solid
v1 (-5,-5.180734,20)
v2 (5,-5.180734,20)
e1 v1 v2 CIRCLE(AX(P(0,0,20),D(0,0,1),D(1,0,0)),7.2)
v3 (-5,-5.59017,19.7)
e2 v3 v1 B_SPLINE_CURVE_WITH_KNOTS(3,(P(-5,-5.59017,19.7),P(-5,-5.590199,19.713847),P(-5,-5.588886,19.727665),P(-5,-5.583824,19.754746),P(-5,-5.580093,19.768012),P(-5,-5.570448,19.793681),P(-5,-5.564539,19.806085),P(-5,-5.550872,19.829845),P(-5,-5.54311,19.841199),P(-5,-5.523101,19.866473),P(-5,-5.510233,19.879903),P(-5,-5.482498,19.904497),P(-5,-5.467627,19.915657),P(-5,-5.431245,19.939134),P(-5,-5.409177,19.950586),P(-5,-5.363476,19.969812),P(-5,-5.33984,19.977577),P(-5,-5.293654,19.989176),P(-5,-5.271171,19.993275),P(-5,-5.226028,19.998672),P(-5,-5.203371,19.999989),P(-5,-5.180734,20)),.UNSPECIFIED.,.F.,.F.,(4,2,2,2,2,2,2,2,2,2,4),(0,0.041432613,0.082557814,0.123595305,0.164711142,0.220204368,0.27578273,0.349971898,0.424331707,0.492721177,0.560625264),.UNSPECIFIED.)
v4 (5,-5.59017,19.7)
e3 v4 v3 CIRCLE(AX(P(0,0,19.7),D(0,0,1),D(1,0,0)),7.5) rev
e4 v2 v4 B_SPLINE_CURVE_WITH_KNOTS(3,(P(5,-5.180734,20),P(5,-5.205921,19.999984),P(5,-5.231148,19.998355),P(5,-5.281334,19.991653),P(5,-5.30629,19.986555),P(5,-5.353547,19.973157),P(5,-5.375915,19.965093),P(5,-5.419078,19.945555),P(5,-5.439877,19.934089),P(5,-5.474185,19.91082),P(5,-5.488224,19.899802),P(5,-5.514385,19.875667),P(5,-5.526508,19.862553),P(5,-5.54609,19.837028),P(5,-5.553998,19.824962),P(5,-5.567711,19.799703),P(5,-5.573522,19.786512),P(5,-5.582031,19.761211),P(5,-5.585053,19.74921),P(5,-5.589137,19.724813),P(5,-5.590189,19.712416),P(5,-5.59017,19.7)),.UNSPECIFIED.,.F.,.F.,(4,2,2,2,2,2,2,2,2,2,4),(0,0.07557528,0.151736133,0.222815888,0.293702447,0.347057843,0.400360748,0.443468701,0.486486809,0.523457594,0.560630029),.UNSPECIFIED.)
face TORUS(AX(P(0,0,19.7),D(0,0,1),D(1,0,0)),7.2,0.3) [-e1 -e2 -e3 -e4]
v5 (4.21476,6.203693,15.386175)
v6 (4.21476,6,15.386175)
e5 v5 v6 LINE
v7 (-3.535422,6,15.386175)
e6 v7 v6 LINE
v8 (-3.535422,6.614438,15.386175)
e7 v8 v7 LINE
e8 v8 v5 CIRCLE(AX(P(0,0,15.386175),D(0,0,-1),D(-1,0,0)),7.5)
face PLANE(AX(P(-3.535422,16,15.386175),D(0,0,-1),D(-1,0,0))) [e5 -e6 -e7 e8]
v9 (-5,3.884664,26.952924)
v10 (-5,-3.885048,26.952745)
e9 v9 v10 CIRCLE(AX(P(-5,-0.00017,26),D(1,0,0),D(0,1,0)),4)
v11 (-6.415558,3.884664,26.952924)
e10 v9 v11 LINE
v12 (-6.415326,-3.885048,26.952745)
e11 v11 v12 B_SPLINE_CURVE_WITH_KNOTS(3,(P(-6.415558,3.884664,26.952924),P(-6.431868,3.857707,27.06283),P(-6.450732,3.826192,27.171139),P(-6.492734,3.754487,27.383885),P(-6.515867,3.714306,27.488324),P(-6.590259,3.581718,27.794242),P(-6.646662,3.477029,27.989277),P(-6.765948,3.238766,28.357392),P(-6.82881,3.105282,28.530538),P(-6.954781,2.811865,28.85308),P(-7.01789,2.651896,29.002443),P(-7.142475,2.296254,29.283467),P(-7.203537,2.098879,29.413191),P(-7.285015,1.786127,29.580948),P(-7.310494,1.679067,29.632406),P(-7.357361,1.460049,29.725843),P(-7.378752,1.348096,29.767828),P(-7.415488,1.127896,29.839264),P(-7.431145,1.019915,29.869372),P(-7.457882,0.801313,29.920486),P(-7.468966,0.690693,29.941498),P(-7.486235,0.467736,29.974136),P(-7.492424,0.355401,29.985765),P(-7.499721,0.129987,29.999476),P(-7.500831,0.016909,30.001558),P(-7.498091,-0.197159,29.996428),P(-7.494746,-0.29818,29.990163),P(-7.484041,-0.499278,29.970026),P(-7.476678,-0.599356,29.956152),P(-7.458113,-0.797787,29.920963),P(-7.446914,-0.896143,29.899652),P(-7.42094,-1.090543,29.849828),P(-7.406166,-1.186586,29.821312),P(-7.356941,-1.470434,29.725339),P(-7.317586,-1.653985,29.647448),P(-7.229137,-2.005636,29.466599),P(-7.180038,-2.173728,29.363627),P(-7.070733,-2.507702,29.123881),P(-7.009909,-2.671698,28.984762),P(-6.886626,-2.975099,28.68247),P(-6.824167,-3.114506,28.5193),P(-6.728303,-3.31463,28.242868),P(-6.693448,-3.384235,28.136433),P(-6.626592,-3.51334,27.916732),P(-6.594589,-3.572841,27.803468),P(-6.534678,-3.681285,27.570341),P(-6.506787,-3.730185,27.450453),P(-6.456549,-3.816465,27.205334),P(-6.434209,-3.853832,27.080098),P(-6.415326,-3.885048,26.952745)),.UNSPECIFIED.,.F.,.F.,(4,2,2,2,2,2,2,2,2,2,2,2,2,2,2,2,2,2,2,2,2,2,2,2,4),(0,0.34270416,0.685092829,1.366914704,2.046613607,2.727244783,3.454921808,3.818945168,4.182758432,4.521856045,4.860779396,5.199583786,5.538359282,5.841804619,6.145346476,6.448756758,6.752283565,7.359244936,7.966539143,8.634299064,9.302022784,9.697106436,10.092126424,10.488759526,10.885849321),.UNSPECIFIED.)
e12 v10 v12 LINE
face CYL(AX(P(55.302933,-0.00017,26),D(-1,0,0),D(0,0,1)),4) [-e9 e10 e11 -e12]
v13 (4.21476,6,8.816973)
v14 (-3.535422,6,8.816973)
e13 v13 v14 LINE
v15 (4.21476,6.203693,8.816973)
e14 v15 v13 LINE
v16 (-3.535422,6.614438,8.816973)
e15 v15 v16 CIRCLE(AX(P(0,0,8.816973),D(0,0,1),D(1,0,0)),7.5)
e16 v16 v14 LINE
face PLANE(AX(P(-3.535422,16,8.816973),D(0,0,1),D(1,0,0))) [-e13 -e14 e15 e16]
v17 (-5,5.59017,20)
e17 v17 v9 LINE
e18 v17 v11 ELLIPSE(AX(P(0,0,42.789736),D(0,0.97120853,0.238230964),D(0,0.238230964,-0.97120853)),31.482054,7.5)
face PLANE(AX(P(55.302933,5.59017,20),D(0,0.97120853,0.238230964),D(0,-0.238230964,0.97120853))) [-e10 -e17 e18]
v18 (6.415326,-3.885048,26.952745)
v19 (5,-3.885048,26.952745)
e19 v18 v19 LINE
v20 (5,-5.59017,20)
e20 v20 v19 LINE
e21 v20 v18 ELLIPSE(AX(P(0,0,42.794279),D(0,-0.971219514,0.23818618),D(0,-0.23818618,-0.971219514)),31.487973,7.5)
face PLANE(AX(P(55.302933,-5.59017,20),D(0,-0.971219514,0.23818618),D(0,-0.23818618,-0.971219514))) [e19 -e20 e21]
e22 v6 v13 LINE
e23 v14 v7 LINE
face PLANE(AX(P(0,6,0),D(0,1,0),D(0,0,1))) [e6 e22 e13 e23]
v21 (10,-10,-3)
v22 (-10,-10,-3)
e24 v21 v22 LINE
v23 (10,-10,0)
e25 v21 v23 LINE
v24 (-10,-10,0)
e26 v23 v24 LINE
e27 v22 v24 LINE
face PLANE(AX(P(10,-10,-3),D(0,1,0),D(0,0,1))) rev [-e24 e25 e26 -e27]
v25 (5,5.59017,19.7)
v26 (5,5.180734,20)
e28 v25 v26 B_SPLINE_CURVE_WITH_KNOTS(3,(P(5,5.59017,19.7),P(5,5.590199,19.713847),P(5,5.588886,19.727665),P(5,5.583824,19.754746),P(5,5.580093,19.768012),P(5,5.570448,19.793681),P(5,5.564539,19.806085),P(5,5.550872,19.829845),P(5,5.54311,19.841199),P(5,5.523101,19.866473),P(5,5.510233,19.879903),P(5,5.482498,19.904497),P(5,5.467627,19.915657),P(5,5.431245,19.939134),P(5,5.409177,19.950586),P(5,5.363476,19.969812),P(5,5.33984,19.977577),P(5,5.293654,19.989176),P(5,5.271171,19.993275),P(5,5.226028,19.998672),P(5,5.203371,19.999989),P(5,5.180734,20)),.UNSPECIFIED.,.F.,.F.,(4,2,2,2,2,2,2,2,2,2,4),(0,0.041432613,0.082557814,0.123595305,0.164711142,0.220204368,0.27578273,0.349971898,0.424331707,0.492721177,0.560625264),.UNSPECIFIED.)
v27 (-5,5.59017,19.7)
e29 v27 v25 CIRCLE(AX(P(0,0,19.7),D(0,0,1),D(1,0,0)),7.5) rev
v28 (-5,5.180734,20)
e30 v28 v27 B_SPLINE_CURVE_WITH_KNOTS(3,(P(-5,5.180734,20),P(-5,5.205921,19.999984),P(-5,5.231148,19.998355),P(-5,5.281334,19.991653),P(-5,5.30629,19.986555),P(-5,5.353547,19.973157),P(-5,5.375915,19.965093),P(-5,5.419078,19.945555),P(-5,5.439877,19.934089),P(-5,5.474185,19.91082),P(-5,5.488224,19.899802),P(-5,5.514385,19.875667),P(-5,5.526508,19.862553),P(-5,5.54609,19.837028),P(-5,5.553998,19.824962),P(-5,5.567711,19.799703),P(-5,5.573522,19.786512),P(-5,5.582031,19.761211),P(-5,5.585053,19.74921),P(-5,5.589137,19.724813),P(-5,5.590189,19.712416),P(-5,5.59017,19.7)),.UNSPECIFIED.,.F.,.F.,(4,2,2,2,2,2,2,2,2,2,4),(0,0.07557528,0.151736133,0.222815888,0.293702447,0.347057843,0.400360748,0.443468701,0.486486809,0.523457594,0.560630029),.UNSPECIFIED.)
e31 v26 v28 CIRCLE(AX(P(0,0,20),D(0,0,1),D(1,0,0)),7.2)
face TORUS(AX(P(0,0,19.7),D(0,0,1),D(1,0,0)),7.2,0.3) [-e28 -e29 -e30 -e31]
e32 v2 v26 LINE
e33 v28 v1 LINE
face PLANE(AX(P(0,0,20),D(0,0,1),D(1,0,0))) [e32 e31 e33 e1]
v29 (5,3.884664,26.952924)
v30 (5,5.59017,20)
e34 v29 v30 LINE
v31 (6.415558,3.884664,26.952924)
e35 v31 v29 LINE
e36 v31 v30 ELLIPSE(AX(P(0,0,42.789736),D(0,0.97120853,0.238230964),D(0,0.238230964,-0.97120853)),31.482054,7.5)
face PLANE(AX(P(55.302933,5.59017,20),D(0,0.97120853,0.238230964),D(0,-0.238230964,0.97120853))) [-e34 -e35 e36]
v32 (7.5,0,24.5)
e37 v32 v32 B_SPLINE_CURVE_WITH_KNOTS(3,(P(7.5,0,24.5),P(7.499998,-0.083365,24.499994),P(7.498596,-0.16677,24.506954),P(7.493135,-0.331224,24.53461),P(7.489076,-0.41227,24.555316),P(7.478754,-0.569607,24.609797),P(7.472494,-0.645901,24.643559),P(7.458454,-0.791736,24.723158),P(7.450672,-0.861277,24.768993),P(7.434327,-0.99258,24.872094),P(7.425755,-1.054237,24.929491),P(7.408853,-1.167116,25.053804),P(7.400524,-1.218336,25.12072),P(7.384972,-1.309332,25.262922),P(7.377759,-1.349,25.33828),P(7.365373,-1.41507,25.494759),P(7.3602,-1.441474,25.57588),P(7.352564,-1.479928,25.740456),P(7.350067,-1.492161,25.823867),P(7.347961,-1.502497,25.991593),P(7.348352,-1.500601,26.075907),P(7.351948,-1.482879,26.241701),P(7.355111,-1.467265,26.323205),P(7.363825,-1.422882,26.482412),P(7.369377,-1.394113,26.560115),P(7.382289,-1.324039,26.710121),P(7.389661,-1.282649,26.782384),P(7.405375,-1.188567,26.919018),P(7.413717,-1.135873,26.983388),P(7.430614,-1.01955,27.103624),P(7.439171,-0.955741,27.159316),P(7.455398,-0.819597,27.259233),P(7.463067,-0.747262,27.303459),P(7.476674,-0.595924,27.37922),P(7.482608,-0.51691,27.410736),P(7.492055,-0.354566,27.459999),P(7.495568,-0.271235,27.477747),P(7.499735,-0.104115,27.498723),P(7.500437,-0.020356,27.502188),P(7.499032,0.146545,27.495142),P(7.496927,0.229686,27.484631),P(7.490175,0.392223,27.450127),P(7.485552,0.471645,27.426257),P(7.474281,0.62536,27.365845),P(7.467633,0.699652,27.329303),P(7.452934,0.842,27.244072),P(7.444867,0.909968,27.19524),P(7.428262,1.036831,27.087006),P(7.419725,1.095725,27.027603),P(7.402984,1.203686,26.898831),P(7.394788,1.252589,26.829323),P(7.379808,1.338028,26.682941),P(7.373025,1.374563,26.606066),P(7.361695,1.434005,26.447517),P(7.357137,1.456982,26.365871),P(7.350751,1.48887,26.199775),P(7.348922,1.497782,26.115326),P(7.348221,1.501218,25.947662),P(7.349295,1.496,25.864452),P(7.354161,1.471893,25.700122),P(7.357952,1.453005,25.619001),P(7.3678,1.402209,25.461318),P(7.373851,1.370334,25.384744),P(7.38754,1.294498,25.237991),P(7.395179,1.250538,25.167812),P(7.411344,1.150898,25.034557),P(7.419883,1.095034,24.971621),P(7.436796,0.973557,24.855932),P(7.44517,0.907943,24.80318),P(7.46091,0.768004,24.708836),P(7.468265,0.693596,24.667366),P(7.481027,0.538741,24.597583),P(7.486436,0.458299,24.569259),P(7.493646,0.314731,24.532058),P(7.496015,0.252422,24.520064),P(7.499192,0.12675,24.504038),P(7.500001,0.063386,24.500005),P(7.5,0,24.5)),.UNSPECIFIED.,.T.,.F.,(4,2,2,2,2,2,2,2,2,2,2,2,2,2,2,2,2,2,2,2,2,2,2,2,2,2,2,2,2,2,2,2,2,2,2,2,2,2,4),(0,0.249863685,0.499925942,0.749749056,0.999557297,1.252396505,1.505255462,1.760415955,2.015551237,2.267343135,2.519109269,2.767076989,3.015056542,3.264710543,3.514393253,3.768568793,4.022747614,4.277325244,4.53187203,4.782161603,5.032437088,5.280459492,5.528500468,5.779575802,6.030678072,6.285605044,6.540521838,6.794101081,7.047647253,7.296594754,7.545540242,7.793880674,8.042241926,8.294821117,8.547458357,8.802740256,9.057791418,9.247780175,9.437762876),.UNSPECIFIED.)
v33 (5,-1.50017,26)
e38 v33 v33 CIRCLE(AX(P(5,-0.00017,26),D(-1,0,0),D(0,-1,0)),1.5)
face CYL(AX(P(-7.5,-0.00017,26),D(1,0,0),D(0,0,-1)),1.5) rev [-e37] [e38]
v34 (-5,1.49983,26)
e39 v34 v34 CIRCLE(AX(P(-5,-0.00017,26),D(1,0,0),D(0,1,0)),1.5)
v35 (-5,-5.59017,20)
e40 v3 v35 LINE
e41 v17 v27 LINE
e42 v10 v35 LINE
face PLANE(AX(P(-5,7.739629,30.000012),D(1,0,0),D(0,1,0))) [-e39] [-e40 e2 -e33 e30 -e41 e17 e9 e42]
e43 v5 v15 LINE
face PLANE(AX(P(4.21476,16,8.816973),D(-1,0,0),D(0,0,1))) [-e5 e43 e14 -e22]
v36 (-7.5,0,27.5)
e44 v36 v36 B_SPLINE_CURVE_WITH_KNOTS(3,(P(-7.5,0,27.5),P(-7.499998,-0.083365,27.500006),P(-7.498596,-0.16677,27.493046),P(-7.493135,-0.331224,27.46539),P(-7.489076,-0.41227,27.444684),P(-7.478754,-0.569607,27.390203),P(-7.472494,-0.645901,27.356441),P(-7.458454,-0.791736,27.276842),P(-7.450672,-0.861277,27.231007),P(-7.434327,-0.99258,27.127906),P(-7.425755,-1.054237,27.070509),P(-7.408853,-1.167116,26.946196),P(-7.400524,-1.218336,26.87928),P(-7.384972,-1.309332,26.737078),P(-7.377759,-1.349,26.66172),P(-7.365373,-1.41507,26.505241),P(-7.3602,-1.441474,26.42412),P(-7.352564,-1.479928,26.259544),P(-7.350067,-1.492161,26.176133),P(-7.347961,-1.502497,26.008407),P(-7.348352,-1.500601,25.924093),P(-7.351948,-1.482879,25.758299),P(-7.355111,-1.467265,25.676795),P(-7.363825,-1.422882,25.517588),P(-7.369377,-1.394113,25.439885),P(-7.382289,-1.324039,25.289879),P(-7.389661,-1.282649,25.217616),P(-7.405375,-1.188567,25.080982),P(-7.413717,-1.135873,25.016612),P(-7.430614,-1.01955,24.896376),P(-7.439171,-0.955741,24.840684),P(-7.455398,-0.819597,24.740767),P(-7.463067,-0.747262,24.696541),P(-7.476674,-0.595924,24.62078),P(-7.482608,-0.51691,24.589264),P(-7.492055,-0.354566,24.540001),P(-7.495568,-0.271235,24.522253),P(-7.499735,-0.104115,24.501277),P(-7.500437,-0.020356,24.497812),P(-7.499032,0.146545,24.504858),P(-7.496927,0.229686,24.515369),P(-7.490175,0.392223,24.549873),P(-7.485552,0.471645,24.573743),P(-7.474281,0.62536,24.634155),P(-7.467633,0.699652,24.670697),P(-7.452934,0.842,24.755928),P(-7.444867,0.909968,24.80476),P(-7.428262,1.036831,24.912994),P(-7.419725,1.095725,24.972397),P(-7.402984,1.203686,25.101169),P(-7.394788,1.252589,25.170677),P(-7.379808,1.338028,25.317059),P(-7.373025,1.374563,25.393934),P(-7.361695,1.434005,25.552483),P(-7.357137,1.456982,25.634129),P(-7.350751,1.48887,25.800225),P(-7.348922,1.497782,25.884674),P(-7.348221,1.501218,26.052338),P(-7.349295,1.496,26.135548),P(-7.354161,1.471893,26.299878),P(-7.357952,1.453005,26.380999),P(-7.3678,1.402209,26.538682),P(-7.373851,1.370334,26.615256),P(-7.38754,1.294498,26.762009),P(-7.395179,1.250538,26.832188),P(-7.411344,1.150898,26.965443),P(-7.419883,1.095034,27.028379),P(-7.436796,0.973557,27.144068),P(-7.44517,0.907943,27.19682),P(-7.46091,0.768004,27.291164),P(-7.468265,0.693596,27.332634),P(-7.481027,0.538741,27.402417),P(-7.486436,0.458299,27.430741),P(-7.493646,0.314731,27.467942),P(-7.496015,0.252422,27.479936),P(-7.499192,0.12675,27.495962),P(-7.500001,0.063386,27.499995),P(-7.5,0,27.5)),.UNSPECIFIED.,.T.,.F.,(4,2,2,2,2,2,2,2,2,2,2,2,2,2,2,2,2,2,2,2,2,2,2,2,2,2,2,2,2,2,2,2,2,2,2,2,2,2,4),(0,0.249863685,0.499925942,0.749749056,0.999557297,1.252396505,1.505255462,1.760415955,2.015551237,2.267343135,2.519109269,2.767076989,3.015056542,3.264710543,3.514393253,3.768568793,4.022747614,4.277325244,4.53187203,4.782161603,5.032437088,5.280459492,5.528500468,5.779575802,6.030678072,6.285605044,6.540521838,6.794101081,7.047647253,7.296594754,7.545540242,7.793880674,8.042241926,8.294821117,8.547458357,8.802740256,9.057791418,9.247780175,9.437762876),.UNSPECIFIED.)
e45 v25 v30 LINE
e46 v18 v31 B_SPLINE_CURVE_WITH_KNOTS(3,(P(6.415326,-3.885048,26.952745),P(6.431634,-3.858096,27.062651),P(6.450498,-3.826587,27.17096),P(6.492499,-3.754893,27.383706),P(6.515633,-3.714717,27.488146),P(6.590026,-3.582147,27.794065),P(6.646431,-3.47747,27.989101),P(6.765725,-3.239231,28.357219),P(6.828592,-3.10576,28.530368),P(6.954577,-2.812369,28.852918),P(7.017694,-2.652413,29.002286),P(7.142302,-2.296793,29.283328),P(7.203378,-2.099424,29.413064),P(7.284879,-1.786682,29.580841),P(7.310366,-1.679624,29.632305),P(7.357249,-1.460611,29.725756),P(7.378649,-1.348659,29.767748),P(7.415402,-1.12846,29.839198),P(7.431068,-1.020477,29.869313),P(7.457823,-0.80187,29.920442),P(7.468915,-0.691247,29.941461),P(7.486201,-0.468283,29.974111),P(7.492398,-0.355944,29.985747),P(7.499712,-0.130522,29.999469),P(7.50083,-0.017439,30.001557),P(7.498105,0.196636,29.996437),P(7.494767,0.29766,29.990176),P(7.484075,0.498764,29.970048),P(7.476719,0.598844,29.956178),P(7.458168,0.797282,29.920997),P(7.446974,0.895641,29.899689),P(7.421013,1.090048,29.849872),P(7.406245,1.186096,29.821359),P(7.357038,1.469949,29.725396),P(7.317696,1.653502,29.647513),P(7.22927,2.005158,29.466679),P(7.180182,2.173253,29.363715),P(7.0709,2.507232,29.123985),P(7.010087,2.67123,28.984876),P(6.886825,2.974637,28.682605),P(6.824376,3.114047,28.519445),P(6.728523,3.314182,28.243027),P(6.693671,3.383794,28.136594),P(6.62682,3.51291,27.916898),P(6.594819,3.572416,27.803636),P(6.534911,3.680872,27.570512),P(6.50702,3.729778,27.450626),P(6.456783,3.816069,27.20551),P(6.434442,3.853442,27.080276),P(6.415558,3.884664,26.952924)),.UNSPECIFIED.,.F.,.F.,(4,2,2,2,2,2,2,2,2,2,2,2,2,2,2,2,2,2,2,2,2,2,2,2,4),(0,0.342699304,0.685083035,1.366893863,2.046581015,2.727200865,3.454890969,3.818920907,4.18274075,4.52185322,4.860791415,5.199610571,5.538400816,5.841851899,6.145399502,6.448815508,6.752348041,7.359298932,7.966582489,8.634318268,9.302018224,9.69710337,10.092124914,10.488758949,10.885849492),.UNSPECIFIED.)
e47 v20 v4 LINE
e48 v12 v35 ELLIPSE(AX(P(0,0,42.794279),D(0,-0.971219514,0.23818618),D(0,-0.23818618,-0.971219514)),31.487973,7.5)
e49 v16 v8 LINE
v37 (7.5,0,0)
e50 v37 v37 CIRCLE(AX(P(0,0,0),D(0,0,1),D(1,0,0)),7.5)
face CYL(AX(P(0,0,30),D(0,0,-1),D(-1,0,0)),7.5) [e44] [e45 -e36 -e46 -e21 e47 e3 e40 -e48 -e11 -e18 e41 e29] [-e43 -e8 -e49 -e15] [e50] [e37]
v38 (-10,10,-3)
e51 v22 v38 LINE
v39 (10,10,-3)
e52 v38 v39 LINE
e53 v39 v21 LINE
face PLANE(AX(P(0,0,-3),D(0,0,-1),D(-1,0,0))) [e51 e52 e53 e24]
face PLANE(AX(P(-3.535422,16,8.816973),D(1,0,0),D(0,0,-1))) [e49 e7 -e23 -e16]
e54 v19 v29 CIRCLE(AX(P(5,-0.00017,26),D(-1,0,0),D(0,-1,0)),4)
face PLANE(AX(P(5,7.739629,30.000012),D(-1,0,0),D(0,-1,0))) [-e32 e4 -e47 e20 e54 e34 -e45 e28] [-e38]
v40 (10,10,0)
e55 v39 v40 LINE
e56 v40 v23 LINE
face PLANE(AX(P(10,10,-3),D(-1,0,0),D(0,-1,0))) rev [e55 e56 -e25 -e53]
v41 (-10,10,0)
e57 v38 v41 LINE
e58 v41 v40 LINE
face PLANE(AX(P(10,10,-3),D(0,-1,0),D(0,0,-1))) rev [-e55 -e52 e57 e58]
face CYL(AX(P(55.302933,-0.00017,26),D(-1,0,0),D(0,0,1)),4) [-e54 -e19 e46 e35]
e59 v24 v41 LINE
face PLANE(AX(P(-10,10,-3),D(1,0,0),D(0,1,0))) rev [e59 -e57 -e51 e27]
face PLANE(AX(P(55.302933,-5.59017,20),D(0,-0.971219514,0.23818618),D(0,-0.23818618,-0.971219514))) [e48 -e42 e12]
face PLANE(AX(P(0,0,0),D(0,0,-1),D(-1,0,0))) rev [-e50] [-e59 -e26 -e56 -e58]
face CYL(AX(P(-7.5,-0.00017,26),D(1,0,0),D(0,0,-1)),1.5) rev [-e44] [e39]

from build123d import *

# Parameters (mm, degrees)
CROQUIS1_R                 = 7.5
SALIENTE_EXTRUIR1_DEPTH    = 30
CORTAR_EXTRUIR1_DEPTH      = 32.819805153
CORTAR_EXTRUIR1_DEPTH_BACK = 10
CROQUIS2_W                 = 10
CROQUIS2_H                 = 15.47925891
CORTAR_EXTRUIR3_DEPTH      = 32.819805153
CORTAR_EXTRUIR3_DEPTH_BACK = 32.819805153
CORTAR_EXTRUIR4_DEPTH      = 32.819805295
CORTAR_EXTRUIR4_DEPTH_BACK = 32.819805295
CROQUIS4_R                 = 1.5
REDONDEO1_R                = 0.3
CROQUIS5_W                 = 20
CROQUIS5_H                 = 20
SALIENTE_EXTRUIR2_DEPTH    = 3
CORTAR_EXTRUIR5_START      = 6
CROQUIS6_W                 = 7.750181945
CROQUIS6_H                 = 6.56920184
CORTAR_EXTRUIR5_DEPTH      = 10


with BuildPart() as part:
    # Croquis1 → Saliente-Extruir1 (new body)
    with BuildSketch(Plane.XY):
        Circle(CROQUIS1_R)
    extrude(amount=SALIENTE_EXTRUIR1_DEPTH)

    # Croquis2 → Cortar-Extruir1 (cut, two sides: drawn at the far end of the back side and taken through both)
    with BuildSketch(Plane.XY.offset(30).offset(-CORTAR_EXTRUIR1_DEPTH_BACK)):
        Rectangle(CROQUIS2_W, CROQUIS2_H)
    extrude(amount=CORTAR_EXTRUIR1_DEPTH + CORTAR_EXTRUIR1_DEPTH_BACK, mode=Mode.SUBTRACT)

    # Croquis3 → Cortar-Extruir3 (cut, two sides: drawn at the far end of the back side and taken through both)
    with BuildSketch(Plane(origin=(0, 0, 0), x_dir=(0, 0, -1), z_dir=(1, 0, 0)).offset(-CORTAR_EXTRUIR3_DEPTH_BACK)):
        with BuildLine():
            Line((-20, 67.5), (-20, 7.5))
            Line((-20, 7.5), (-20, 5.590169944))
            Line((-20, 5.590169944), (-26.952923855, 3.884664175))
            ThreePointArc((-26.952923855, 3.884664175), (-29.999999999, -0.000262165), (-26.952744721, -3.885047998))
            Line((-26.952744721, -3.885047998), (-20, -5.590169944))
            Line((-20, -5.590169944), (-20, -7.5))
            Line((-20, -7.5), (-20, -67.5))
            Line((-20, -67.5), (-140, -67.5))
            Line((-140, -67.5), (-140, 67.5))
            Line((-140, 67.5), (-20, 67.5))
        make_face()
    extrude(amount=CORTAR_EXTRUIR3_DEPTH + CORTAR_EXTRUIR3_DEPTH_BACK, mode=Mode.SUBTRACT)

    # Croquis4 → Cortar-Extruir4 (cut, two sides: drawn at the far end of the back side and taken through both)
    with BuildSketch(Plane(origin=(0, 0, 0), x_dir=(0, 0, -1), z_dir=(1, 0, 0)).offset(-CORTAR_EXTRUIR4_DEPTH_BACK)):
        with Locations(Location((-26, -0.000169944, 0), (0, 0, 90))):
            Circle(CROQUIS4_R)
    extrude(amount=CORTAR_EXTRUIR4_DEPTH + CORTAR_EXTRUIR4_DEPTH_BACK, mode=Mode.SUBTRACT)

    # Redondeo1
    # the kernel refuses this fillet: 0.3 mm, written as the material it takes off along each edge
    with BuildSketch(Plane(origin=(0, 0, 20), x_dir=(0.7377709544179419, -0.6750511231138268, 0), z_dir=(0.6750511231138268, 0.7377709544179419, 0))) as redondeo1_piece_1_section:
        with BuildLine():
            CenterArc((7.5 - REDONDEO1_R, REDONDEO1_R), REDONDEO1_R, 270, 90)
            Line((7.5 - REDONDEO1_R, 0), (7.5, 0))
            Line((7.5, 0), (7.5, REDONDEO1_R))
        make_face()
    redondeo1_piece_1 = revolve(axis=Axis((0, 0, 20), (0, 0, -1)), revolution_arc=95.083759333, mode=Mode.PRIVATE)
    redondeo1_piece_1 = split(redondeo1_piece_1, bisect_by=Plane(origin=(5, -5.527382777, 19.949282133), z_dir=(-1, 0, 0)), keep=Keep.TOP, mode=Mode.PRIVATE)
    redondeo1_piece_1 = split(redondeo1_piece_1, bisect_by=Plane(origin=(-5, -5.527382777, 19.949282133), z_dir=(1, 0, 0)), keep=Keep.TOP, mode=Mode.PRIVATE)
    add(redondeo1_piece_1, mode=Mode.SUBTRACT)
    with BuildSketch(Plane(origin=(0, 0, 20), x_dir=(-0.737770954417942, 0.6750511231138266, 0), z_dir=(-0.6750511231138266, -0.737770954417942, 0))) as redondeo1_piece_2_section:
        with BuildLine():
            CenterArc((7.5 - REDONDEO1_R, REDONDEO1_R), REDONDEO1_R, 270, 90)
            Line((7.5 - REDONDEO1_R, 0), (7.5, 0))
            Line((7.5, 0), (7.5, REDONDEO1_R))
        make_face()
    redondeo1_piece_2 = revolve(axis=Axis((0, 0, 20), (0, 0, -1)), revolution_arc=95.083759333, mode=Mode.PRIVATE)
    redondeo1_piece_2 = split(redondeo1_piece_2, bisect_by=Plane(origin=(5, 5.527385531, 19.949280237), z_dir=(-1, 0, 0)), keep=Keep.TOP, mode=Mode.PRIVATE)
    redondeo1_piece_2 = split(redondeo1_piece_2, bisect_by=Plane(origin=(-5, 5.527385531, 19.949280237), z_dir=(1, 0, 0)), keep=Keep.TOP, mode=Mode.PRIVATE)
    add(redondeo1_piece_2, mode=Mode.SUBTRACT)

    # Croquis5 → Saliente-Extruir2 (add)
    with BuildSketch(Plane(origin=(0, 0, 0), x_dir=(-1, 0, 0), z_dir=(0, 0, -1))):
        Rectangle(CROQUIS5_W, CROQUIS5_H)
    extrude(amount=SALIENTE_EXTRUIR2_DEPTH)

    # Croquis6 → Cortar-Extruir5 (cut)
    with BuildSketch(Plane(origin=(0, 0, 0), x_dir=(1, 0, 0), z_dir=(0, 1, 0)).offset(CORTAR_EXTRUIR5_START)):
        with Locations((0.339668607, -12.101574185)):
            Rectangle(CROQUIS6_W, CROQUIS6_H)
    extrude(amount=CORTAR_EXTRUIR5_DEPTH, mode=Mode.SUBTRACT)


solid = part.part
